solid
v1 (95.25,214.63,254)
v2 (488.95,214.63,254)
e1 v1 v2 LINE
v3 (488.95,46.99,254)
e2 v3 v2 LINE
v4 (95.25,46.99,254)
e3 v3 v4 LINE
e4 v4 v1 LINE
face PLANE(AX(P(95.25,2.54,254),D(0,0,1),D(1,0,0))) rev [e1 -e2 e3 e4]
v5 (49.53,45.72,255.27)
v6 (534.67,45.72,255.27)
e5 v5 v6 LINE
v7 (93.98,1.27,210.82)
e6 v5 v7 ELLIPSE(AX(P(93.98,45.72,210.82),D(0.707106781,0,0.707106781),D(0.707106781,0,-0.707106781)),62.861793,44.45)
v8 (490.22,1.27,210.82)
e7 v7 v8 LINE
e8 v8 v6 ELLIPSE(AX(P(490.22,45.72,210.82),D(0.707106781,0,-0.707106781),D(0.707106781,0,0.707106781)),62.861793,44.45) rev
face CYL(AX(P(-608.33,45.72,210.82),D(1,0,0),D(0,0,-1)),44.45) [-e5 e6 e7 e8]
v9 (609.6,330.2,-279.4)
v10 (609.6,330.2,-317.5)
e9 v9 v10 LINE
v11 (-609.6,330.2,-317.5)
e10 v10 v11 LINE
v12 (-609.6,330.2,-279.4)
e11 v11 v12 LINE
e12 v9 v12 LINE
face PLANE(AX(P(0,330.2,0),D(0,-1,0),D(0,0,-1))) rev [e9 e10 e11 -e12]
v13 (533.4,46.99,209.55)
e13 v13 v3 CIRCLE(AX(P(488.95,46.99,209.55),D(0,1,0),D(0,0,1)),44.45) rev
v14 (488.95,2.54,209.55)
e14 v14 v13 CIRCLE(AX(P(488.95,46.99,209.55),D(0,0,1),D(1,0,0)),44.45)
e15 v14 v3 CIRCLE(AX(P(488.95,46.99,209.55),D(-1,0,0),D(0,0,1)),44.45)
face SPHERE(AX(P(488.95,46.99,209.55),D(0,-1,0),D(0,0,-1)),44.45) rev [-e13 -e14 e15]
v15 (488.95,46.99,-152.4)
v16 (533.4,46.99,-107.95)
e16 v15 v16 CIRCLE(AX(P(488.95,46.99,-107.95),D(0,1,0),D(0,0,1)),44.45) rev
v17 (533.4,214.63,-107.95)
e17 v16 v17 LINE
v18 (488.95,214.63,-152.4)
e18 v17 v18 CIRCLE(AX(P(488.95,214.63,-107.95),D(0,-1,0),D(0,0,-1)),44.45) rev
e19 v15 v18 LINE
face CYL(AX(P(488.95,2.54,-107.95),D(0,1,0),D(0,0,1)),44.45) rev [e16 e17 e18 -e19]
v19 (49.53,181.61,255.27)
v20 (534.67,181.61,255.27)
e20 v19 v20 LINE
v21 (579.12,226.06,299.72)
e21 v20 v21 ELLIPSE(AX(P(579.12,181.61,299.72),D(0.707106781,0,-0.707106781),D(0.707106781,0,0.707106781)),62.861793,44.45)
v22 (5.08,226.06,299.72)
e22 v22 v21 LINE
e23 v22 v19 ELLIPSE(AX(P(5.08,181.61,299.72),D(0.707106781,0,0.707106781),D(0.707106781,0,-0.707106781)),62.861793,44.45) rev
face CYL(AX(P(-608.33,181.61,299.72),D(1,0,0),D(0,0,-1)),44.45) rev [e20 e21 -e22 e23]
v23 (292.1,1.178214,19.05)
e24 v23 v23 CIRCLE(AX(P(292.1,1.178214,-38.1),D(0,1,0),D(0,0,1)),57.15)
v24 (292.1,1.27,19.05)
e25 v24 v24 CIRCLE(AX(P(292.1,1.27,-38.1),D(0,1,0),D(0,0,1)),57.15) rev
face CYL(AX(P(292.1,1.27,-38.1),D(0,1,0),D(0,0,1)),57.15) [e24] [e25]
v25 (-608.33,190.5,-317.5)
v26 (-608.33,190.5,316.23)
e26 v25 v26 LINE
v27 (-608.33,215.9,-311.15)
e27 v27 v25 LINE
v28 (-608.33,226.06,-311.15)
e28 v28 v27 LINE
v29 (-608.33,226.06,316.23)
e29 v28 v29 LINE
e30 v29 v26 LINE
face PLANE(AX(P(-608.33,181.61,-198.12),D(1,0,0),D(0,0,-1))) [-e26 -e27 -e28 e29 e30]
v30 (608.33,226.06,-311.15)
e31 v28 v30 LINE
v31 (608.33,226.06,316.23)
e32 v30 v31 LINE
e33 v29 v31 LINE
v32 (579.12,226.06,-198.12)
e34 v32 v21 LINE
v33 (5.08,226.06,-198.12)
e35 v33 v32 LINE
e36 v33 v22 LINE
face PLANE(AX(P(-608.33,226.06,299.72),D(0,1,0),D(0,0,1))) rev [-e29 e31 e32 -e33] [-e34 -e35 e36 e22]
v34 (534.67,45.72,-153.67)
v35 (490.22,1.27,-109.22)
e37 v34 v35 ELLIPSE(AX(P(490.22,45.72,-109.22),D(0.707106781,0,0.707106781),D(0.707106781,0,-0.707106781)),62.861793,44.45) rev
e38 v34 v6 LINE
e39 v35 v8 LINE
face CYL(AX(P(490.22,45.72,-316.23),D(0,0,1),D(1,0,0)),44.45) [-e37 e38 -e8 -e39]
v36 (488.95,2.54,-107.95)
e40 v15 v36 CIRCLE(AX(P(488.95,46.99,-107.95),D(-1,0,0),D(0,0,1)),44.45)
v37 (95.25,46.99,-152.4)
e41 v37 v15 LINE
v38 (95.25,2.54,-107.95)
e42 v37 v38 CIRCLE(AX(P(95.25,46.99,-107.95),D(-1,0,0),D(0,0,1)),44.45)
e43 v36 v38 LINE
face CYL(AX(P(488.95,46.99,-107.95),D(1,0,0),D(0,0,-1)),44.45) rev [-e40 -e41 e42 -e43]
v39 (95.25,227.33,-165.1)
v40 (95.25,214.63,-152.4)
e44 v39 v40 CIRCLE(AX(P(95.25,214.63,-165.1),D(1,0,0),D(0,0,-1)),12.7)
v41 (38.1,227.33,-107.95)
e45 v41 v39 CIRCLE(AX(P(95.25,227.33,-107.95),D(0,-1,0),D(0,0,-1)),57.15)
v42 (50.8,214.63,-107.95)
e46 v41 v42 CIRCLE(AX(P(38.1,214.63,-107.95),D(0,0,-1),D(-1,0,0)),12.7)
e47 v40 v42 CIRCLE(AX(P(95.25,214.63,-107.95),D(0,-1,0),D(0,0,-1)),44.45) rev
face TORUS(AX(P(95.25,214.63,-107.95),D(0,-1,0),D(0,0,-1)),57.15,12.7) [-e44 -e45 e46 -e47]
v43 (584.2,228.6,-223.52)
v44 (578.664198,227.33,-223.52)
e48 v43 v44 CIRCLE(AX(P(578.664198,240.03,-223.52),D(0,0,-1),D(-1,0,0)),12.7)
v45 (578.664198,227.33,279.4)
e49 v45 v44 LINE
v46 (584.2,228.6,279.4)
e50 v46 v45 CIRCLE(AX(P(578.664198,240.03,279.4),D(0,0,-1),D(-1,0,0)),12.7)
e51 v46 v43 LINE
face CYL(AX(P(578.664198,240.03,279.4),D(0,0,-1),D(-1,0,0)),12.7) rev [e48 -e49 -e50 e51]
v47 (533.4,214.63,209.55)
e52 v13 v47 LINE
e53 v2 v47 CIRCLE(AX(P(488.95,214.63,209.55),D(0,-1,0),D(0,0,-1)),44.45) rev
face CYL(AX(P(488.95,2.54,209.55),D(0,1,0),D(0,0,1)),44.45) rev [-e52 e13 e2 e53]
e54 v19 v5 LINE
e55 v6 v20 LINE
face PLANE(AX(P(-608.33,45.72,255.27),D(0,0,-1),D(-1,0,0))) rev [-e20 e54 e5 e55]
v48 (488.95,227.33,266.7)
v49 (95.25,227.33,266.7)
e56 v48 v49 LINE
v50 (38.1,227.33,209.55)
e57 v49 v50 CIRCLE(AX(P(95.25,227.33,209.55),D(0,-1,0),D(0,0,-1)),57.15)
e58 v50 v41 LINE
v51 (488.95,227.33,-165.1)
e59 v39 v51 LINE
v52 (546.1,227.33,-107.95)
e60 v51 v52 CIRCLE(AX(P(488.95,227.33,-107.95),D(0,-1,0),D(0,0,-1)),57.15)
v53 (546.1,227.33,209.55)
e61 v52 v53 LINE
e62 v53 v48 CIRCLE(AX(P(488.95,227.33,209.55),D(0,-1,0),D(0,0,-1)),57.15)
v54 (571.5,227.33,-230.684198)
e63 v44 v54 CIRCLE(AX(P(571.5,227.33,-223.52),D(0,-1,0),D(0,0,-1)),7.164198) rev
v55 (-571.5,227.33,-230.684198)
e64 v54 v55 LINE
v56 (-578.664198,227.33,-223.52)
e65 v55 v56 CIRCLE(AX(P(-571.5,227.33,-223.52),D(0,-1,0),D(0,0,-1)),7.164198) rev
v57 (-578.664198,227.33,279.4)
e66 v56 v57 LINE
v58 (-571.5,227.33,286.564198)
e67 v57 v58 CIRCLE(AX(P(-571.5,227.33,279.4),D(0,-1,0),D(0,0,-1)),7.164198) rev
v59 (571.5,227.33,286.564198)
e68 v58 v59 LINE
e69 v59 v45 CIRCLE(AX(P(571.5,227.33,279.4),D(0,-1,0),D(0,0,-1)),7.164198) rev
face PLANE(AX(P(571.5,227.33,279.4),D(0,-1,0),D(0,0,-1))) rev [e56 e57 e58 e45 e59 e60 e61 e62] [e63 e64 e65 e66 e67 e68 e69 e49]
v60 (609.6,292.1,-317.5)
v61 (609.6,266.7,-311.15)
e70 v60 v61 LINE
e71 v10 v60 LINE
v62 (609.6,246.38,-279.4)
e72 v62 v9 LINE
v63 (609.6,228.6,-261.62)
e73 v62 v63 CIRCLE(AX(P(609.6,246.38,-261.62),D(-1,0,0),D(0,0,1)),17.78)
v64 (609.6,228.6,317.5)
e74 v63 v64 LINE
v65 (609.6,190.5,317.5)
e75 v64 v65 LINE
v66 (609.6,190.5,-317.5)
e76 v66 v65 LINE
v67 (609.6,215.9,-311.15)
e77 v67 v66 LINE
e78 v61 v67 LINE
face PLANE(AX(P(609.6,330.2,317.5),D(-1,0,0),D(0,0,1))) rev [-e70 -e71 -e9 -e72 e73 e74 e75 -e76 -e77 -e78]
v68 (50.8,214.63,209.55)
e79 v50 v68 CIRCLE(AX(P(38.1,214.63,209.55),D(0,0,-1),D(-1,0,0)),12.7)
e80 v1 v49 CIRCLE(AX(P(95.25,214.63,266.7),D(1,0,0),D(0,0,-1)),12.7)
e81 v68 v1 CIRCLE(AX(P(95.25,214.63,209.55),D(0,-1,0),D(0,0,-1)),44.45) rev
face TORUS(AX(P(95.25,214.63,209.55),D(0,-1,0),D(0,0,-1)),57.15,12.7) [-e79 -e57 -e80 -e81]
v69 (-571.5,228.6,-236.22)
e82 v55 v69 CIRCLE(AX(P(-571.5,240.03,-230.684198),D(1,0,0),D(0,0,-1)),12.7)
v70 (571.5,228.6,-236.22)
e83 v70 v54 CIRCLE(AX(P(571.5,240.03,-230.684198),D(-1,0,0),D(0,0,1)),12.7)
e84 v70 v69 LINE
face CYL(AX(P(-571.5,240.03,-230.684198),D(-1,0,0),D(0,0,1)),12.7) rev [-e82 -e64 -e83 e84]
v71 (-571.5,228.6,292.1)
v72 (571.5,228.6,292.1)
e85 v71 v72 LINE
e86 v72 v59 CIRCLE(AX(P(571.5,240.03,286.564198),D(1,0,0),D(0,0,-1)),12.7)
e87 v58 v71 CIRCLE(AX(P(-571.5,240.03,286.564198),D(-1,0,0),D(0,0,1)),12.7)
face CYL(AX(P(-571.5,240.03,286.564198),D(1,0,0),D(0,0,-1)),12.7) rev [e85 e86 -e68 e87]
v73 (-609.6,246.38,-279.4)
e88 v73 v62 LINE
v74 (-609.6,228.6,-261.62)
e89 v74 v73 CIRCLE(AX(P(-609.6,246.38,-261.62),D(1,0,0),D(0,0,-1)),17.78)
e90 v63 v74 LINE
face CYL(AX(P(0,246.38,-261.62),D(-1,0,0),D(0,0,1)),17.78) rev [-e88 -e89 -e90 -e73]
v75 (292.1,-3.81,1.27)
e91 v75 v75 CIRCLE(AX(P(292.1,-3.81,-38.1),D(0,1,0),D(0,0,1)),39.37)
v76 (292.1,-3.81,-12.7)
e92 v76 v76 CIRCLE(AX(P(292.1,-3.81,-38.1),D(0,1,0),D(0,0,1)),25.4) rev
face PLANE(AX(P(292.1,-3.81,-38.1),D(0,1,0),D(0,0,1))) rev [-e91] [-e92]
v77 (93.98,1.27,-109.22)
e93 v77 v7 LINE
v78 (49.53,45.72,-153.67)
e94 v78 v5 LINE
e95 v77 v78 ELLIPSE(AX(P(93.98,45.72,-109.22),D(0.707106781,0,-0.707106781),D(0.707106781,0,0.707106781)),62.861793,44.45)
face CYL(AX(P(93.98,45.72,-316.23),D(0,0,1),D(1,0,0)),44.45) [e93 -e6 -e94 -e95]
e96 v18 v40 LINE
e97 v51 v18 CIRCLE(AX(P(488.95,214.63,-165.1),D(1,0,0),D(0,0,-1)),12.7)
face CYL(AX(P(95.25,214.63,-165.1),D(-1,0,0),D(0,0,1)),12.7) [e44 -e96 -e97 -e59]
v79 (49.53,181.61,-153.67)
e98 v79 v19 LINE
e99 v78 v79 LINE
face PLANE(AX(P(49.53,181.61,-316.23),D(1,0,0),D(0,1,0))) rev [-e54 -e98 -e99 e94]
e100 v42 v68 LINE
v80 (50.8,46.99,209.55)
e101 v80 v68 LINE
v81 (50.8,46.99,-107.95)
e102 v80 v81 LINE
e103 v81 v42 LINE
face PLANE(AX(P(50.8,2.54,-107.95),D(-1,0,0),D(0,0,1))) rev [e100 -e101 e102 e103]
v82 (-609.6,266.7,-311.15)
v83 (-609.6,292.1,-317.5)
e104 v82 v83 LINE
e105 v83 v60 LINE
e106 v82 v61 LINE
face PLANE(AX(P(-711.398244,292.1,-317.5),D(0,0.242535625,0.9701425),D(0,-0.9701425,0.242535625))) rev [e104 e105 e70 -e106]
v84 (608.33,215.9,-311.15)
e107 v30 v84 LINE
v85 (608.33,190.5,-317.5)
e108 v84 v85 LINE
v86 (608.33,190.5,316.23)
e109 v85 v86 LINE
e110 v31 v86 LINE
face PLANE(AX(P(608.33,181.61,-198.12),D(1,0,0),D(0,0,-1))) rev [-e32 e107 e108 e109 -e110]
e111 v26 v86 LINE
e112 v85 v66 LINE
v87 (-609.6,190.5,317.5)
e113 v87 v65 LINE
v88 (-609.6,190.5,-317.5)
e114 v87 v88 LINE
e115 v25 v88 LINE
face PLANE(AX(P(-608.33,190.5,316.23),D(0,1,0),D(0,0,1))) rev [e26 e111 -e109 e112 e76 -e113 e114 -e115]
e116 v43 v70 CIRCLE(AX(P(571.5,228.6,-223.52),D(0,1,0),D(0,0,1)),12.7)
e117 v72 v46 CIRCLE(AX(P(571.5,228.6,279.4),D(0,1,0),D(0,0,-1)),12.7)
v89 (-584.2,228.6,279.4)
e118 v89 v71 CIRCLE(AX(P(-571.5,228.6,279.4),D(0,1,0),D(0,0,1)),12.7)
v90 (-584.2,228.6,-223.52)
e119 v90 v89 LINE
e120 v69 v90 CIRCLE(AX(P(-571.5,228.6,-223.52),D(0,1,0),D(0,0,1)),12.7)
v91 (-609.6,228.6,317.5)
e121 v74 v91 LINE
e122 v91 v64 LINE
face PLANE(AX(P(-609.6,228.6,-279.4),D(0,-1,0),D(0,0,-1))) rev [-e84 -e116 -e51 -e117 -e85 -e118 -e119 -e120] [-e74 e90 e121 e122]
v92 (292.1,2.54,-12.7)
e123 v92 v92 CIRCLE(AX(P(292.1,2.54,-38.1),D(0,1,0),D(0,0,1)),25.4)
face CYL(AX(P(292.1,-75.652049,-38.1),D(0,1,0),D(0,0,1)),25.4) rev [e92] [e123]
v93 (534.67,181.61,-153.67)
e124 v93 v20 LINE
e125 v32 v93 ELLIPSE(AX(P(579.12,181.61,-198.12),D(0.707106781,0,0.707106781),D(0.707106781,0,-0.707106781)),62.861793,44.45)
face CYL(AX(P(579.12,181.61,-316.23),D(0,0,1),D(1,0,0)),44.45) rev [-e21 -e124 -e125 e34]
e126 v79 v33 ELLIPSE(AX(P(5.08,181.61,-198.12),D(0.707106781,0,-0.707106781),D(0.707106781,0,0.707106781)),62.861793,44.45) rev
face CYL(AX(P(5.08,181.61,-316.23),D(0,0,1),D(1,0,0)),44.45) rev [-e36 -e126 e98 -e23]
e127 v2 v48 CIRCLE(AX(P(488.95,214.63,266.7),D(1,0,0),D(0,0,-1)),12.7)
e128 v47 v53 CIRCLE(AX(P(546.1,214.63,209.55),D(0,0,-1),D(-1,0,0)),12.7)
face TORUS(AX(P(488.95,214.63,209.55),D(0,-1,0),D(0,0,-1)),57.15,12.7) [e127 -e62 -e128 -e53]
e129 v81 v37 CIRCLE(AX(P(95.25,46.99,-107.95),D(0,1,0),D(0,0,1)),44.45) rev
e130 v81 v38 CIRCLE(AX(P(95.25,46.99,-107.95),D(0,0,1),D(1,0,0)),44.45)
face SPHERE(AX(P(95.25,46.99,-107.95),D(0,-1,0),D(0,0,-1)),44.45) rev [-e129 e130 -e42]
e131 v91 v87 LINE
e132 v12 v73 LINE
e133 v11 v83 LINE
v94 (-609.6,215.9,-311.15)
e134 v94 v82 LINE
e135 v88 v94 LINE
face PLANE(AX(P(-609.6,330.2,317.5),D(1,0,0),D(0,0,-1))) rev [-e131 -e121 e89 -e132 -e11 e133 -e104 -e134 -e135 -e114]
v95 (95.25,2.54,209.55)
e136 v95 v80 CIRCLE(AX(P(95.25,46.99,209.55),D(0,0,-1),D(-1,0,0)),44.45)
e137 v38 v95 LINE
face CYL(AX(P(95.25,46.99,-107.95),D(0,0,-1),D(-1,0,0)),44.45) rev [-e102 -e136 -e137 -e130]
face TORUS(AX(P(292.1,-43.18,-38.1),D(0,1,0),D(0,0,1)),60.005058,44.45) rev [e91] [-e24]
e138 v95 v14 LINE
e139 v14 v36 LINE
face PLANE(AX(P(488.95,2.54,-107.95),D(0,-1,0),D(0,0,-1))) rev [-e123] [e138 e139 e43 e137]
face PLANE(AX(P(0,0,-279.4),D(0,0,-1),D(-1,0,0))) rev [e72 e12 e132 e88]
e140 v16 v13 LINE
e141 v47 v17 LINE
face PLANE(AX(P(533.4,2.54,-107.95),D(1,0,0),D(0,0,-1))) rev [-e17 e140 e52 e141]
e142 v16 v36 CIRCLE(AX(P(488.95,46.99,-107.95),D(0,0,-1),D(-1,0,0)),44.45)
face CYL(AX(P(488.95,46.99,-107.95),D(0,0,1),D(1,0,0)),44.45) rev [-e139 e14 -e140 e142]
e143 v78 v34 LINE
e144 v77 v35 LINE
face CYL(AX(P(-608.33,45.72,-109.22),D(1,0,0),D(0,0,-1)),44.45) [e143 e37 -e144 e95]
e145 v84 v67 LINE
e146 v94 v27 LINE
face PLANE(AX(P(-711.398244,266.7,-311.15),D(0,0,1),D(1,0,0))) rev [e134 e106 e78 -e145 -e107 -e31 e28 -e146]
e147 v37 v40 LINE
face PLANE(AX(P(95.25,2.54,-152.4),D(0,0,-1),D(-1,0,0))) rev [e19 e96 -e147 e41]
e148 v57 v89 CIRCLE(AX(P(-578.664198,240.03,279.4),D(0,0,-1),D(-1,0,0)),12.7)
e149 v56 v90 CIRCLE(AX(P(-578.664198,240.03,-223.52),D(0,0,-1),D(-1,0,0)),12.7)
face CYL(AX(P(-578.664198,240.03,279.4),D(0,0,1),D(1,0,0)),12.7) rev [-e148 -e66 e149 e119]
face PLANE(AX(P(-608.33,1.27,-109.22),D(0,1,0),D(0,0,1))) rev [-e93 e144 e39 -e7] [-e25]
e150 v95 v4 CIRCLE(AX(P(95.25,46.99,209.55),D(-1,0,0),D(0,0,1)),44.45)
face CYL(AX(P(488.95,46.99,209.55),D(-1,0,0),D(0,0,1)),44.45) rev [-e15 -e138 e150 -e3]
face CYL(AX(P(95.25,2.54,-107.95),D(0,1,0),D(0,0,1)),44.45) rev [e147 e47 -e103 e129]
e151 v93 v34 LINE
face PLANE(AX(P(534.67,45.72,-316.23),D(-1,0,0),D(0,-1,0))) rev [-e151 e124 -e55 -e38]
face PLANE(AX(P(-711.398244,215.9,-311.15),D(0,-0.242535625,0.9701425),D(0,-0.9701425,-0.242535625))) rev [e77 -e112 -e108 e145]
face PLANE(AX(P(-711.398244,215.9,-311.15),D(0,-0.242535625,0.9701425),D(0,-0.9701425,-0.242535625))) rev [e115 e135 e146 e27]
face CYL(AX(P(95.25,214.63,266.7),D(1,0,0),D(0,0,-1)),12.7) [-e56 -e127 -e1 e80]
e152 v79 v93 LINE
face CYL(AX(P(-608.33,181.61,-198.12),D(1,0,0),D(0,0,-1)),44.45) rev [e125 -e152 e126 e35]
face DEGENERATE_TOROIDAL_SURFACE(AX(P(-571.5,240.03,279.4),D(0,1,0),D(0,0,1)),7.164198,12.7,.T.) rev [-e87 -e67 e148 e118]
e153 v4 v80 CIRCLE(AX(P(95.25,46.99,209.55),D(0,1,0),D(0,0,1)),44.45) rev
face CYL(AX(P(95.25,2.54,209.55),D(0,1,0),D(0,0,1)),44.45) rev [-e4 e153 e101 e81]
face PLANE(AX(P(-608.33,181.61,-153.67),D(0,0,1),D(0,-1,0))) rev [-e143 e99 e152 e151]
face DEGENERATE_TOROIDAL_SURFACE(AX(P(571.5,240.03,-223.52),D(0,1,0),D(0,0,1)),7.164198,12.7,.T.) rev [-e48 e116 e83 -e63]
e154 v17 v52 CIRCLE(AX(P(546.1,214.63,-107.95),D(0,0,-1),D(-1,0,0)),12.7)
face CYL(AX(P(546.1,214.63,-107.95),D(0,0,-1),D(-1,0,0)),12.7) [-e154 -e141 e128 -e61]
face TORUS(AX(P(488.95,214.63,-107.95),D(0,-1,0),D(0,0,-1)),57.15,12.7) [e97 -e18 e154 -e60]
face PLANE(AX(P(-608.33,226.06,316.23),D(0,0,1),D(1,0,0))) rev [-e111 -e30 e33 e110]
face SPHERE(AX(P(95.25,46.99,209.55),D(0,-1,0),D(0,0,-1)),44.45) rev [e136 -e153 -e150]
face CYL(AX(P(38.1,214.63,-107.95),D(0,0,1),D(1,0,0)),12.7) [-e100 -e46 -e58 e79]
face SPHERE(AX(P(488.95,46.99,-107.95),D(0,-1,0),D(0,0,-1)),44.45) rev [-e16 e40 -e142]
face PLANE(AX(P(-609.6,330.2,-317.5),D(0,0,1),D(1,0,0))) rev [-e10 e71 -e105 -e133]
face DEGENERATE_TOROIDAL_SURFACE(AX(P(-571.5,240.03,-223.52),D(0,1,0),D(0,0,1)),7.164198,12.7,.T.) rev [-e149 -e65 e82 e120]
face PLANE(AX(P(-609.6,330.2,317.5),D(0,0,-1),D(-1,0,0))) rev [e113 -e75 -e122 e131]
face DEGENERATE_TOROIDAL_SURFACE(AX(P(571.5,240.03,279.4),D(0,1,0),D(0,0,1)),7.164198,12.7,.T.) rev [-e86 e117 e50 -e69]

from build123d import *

# Parameters (mm, degrees)
SKETCH1_W           = 1219.2
SKETCH1_H           = 635
BOSS_EXTRUDE2_DEPTH = 330.2
SKETCH3_W           = 1219.2
SKETCH3_H           = 101.6
CUT_EXTRUDE1_DEPTH  = 596.9
FILLET2_R           = 17.78
CUT_EXTRUDE2_DEPTH  = 226.06
FILLET4_R           = 44.45
CUT_EXTRUDE3_DEPTH  = 1.27
FILLET5_R           = 12.7
CUT_EXTRUDE4_DEPTH  = 608.33
CUT_EXTRUDE6_DEPTH  = 316.23
SKETCH12_W          = 635
SKETCH12_H          = 190.5
CUT_EXTRUDE7_DEPTH  = 2.54
SKETCH13_W          = 635
SKETCH13_H          = 190.5
CUT_EXTRUDE8_DEPTH  = 2.54
SKETCH15_R          = 25.4
CUT_EXTRUDE9_DEPTH  = 6.35
CUT_EXTRUDE10_START = -1219.2
CUT_EXTRUDE10_DEPTH = 1219.2


with BuildPart() as part:
    # Sketch1 → Boss-Extrude2 (new body)
    with BuildSketch(Plane(origin=(0, 0, 0), x_dir=(1, 0, 0), z_dir=(0, 1, 0))):
        Rectangle(SKETCH1_W, SKETCH1_H)
    extrude(amount=BOSS_EXTRUDE2_DEPTH)

    # Sketch3 → Cut-Extrude1 (cut)
    with BuildSketch(Plane.XY.offset(317.5)):
        with Locations((0, 279.4)):
            Rectangle(SKETCH3_W, SKETCH3_H)
    extrude(amount=-CUT_EXTRUDE1_DEPTH, mode=Mode.SUBTRACT)

    # Fillet2
    fillet2_edges = [part.edges().sort_by_distance(p)[0] for p in [
        (0, 228.6, -279.4),
    ]]
    fillet(fillet2_edges, radius=FILLET2_R)

    # Sketch5 → Cut-Extrude2 (cut)
    with BuildSketch(Plane(origin=(0, 228.6, 0), x_dir=(1, 0, 0), z_dir=(0, 1, 0))):
        with BuildLine():
            Line((95.25, 152.4), (488.95, 152.4))
            ThreePointArc((488.95, 152.4), (520.380896424, 139.380896424), (533.4, 107.95))
            Line((533.4, 107.95), (533.4, -209.55))
            ThreePointArc((533.4, -209.55), (520.380896424, -240.980896424), (488.95, -254))
            Line((488.95, -254), (95.25, -254))
            ThreePointArc((95.25, -254), (63.819103576, -240.980896424), (50.8, -209.55))
            Line((50.8, -209.55), (50.8, 107.95))
            ThreePointArc((50.8, 107.95), (63.819103576, 139.380896424), (95.25, 152.4))
        make_face()
    extrude(amount=-CUT_EXTRUDE2_DEPTH, mode=Mode.SUBTRACT)

    # Fillet4
    fillet4_edges = [part.edges().sort_by_distance(p)[0] for p in [
        (520.380896424, 2.54, -139.380896424),
        (533.4, 2.54, 50.8),
        (520.380896424, 2.54, 240.980896424),
        (292.1, 2.54, 254),
        (63.819103576, 2.54, 240.980896424),
        (50.8, 2.54, 50.8),
        (63.819103576, 2.54, -139.380896424),
        (292.1, 2.54, -152.4),
    ]]
    fillet(fillet4_edges, radius=FILLET4_R)

    # Sketch7 → Cut-Extrude3 (cut)
    with BuildSketch(Plane(origin=(0, 228.6, 0), x_dir=(1, 0, 0), z_dir=(0, 1, 0))):
        with BuildLine():
            Line((-571.5, -292.1), (571.5, -292.1))
            ThreePointArc((571.5, -292.1), (580.480256121, -288.380256121), (584.2, -279.4))
            Line((584.2, -279.4), (584.2, 223.52))
            ThreePointArc((584.2, 223.52), (580.480256121, 232.500256121), (571.5, 236.22))
            Line((571.5, 236.22), (-571.5, 236.22))
            ThreePointArc((-571.5, 236.22), (-580.480256121, 232.500256121), (-584.2, 223.52))
            Line((-584.2, 223.52), (-584.2, -279.4))
            ThreePointArc((-584.2, -279.4), (-580.480256121, -288.380256121), (-571.5, -292.1))
        make_face()
    extrude(amount=-CUT_EXTRUDE3_DEPTH, mode=Mode.SUBTRACT)

    # Fillet5
    # the kernel refuses this fillet: 12.7 mm, written as the material it adds along each edge
    with BuildSketch(Plane(origin=(-571.5, 227.33, 292.1), x_dir=(0, 0, -1), z_dir=(1, 0, 0)), Plane(origin=(571.5, 227.33, -236.22), x_dir=(0, 0, 1), z_dir=(-1, 0, 0))) as fillet5_piece_1:
        with BuildLine():
            CenterArc((5.535801658, 12.7), FILLET5_R, 244.158067237, 25.841932763)
            Line((0, 1.27), (0, 0))
            Line((0, 0), (5.535801658, 0))
        make_face()
    extrude(amount=1143)
    with BuildSketch(Plane(origin=(-571.5, 227.33, 279.4), x_dir=(-1, 0, 0), z_dir=(0, 0, -1))) as fillet5_piece_2:
        with BuildLine():
            CenterArc((7.164198342, 12.7), FILLET5_R, 270, 25.841932763)
            Line((12.7, 1.27), (12.7, 0))
            Line((12.7, 0), (7.164198342, 0))
        make_face()
    revolve(axis=Axis((-571.5, 227.33, 279.4), (0, 1, 0)), revolution_arc=90)
    with BuildSketch(Plane(origin=(-584.2, 227.33, -223.52), x_dir=(1, 0, 0), z_dir=(0, 0, 1)), Plane(origin=(584.2, 227.33, 279.4), x_dir=(-1, 0, 0), z_dir=(0, 0, -1))) as fillet5_piece_3:
        with BuildLine():
            CenterArc((5.535801658, 12.7), FILLET5_R, 244.158067237, 25.841932763)
            Line((0, 1.27), (0, 0))
            Line((0, 0), (5.535801658, 0))
        make_face()
    extrude(amount=502.92)
    with BuildSketch(Plane(origin=(-571.5, 227.33, -223.52), x_dir=(0, 0, -1), z_dir=(1, 0, 0))) as fillet5_piece_4:
        with BuildLine():
            CenterArc((7.164198342, 12.7), FILLET5_R, 270, 25.841932763)
            Line((12.7, 1.27), (12.7, 0))
            Line((12.7, 0), (7.164198342, 0))
        make_face()
    revolve(axis=Axis((-571.5, 227.33, -223.52), (0, 1, 0)), revolution_arc=90)
    with BuildSketch(Plane(origin=(571.5, 227.33, -223.52), x_dir=(1, 0, 0), z_dir=(0, 0, 1))) as fillet5_piece_5:
        with BuildLine():
            CenterArc((7.164198342, 12.7), FILLET5_R, 270, 25.841932763)
            Line((12.7, 1.27), (12.7, 0))
            Line((12.7, 0), (7.164198342, 0))
        make_face()
    revolve(axis=Axis((571.5, 227.33, -223.52), (0, 1, 0)), revolution_arc=90)
    with BuildSketch(Plane(origin=(571.5, 227.33, 279.4), x_dir=(0, 0, 1), z_dir=(-1, 0, 0))) as fillet5_piece_6:
        with BuildLine():
            CenterArc((7.164198342, 12.7), FILLET5_R, 270, 25.841932763)
            Line((12.7, 1.27), (12.7, 0))
            Line((12.7, 0), (7.164198342, 0))
        make_face()
    revolve(axis=Axis((571.5, 227.33, 279.4), (0, 1, 0)), revolution_arc=90)
    # the kernel refuses this fillet: 12.7 mm, written as the material it takes off along each edge
    with BuildSketch(Plane(origin=(488.95, 227.33, -107.95), x_dir=(1, 0, 0), z_dir=(0, 0, 1))) as fillet5_2_piece_1:
        with BuildLine():
            CenterArc((44.45 + FILLET5_R, -FILLET5_R), FILLET5_R, 90, 90)
            Line((44.45, -FILLET5_R), (44.45, 0))
            Line((44.45, 0), (44.45 + FILLET5_R, 0))
        make_face()
    revolve(axis=Axis((488.95, 227.33, -107.95), (0, 1, 0)), revolution_arc=90, mode=Mode.SUBTRACT)
    with BuildSketch(Plane(origin=(488.95, 227.33, -152.4), x_dir=(0, 0, -1), z_dir=(-1, 0, 0)), Plane(origin=(95.25, 227.33, 254), x_dir=(0, 0, 1), z_dir=(1, 0, 0))) as fillet5_2_piece_2:
        with BuildLine():
            CenterArc((FILLET5_R, FILLET5_R), FILLET5_R, 180, 90)
            Line((0, FILLET5_R), (0, 0))
            Line((0, 0), (FILLET5_R, 0))
        make_face()
    extrude(amount=393.7, mode=Mode.SUBTRACT)
    with BuildSketch(Plane(origin=(95.25, 227.33, -107.95), x_dir=(0, 0, -1), z_dir=(1, 0, 0))) as fillet5_2_piece_3:
        with BuildLine():
            CenterArc((44.45 + FILLET5_R, -FILLET5_R), FILLET5_R, 90, 90)
            Line((44.45, -FILLET5_R), (44.45, 0))
            Line((44.45, 0), (44.45 + FILLET5_R, 0))
        make_face()
    revolve(axis=Axis((95.25, 227.33, -107.95), (0, 1, 0)), revolution_arc=90, mode=Mode.SUBTRACT)
    with BuildSketch(Plane(origin=(50.8, 227.33, -107.95), x_dir=(0, -1, 0), z_dir=(0, 0, 1))) as fillet5_2_piece_4:
        with BuildLine():
            CenterArc((FILLET5_R, -FILLET5_R), FILLET5_R, 90, 90)
            Line((0, -FILLET5_R), (0, 0))
            Line((0, 0), (FILLET5_R, 0))
        make_face()
    extrude(amount=317.5, mode=Mode.SUBTRACT)
    with BuildSketch(Plane(origin=(95.25, 227.33, 209.55), x_dir=(-1, 0, 0), z_dir=(0, 0, -1))) as fillet5_2_piece_5:
        with BuildLine():
            CenterArc((44.45 + FILLET5_R, -FILLET5_R), FILLET5_R, 90, 90)
            Line((44.45, -FILLET5_R), (44.45, 0))
            Line((44.45, 0), (44.45 + FILLET5_R, 0))
        make_face()
    revolve(axis=Axis((95.25, 227.33, 209.55), (0, 1, 0)), revolution_arc=90, mode=Mode.SUBTRACT)
    with BuildSketch(Plane(origin=(488.95, 227.33, 209.55), x_dir=(0, 0, 1), z_dir=(-1, 0, 0))) as fillet5_2_piece_6:
        with BuildLine():
            CenterArc((44.45 + FILLET5_R, -FILLET5_R), FILLET5_R, 90, 90)
            Line((44.45, -FILLET5_R), (44.45, 0))
            Line((44.45, 0), (44.45 + FILLET5_R, 0))
        make_face()
    revolve(axis=Axis((488.95, 227.33, 209.55), (0, 1, 0)), revolution_arc=90, mode=Mode.SUBTRACT)
    with BuildSketch(Plane(origin=(533.4, 227.33, 209.55), x_dir=(1, 0, 0), z_dir=(0, 0, -1))) as fillet5_2_piece_7:
        with BuildLine():
            CenterArc((FILLET5_R, FILLET5_R), FILLET5_R, 180, 90)
            Line((0, FILLET5_R), (0, 0))
            Line((0, 0), (FILLET5_R, 0))
        make_face()
    extrude(amount=317.5, mode=Mode.SUBTRACT)

    # Sketch9 → Cut-Extrude4 (cut, symmetric)
    with BuildSketch(Plane(origin=(0, 0, 0), x_dir=(0, 0, -1), z_dir=(1, 0, 0))):
        with BuildLine():
            Line((317.5, 226.06), (198.12, 226.06))
            ThreePointArc((198.12, 226.06), (166.689103576, 213.040896424), (153.67, 181.61))
            Line((153.67, 181.61), (153.67, 45.72))
            ThreePointArc((153.67, 45.72), (140.650896424, 14.289103576), (109.22, 1.27))
            Line((109.22, 1.27), (-210.82, 1.27))
            ThreePointArc((-210.82, 1.27), (-242.250896424, 14.289103576), (-255.27, 45.72))
            Line((-255.27, 45.72), (-255.27, 181.61))
            ThreePointArc((-255.27, 181.61), (-268.289103576, 213.040896424), (-299.72, 226.06))
            Line((-299.72, 226.06), (-316.23, 226.06))
            Line((-316.23, 226.06), (-316.23, 190.5))
            Line((-316.23, 190.5), (-317.5, 190.5))
            Line((-317.5, 190.5), (-317.5, 0))
            Line((-317.5, 0), (317.5, 0))
            Line((317.5, 0), (317.5, 226.06))
        make_face()
    extrude(amount=CUT_EXTRUDE4_DEPTH, both=True, mode=Mode.SUBTRACT)

    # Sketch11 → Cut-Extrude6 (cut, symmetric)
    with BuildSketch(Plane.XY):
        with BuildLine():
            Line((-608.33, 226.06), (5.08, 226.06))
            ThreePointArc((5.08, 226.06), (36.510896424, 213.040896424), (49.53, 181.61))
            Line((49.53, 181.61), (49.53, 45.72))
            ThreePointArc((49.53, 45.72), (62.549103576, 14.289103576), (93.98, 1.27))
            Line((93.98, 1.27), (-608.33, 1.27))
            Line((-608.33, 1.27), (-608.33, 226.06))
        make_face()
        with BuildLine():
            Line((534.67, 45.72), (534.67, 181.61))
            ThreePointArc((534.67, 181.61), (547.689103576, 213.040896424), (579.12, 226.06))
            Line((579.12, 226.06), (608.33, 226.06))
            Line((608.33, 226.06), (608.33, 1.27))
            Line((608.33, 1.27), (490.22, 1.27))
            ThreePointArc((490.22, 1.27), (521.650896424, 14.289103576), (534.67, 45.72))
        make_face()
    extrude(amount=CUT_EXTRUDE6_DEPTH, both=True, mode=Mode.SUBTRACT)

    # Sketch12 → Cut-Extrude7 (cut)
    with BuildSketch(Plane.ZY.offset(609.6)):
        with Locations((0, 95.25)):
            Rectangle(SKETCH12_W, SKETCH12_H)
    extrude(amount=-CUT_EXTRUDE7_DEPTH, mode=Mode.SUBTRACT)

    # Sketch13 → Cut-Extrude8 (cut)
    with BuildSketch(Plane(origin=(609.6, 0, 0), x_dir=(0, 0, -1), z_dir=(1, 0, 0))):
        with Locations((0, 95.25)):
            Rectangle(SKETCH13_W, SKETCH13_H)
    extrude(amount=-CUT_EXTRUDE8_DEPTH, mode=Mode.SUBTRACT)

    # Sketch16 → Revolve1 (revolve)
    with BuildSketch(Plane(origin=(292.1, 0, 0), x_dir=(0, 0, -1), z_dir=(1, 0, 0)), mode=Mode.PRIVATE) as revolve1_sk:
        with BuildLine():
            Line((38.1, 1.27), (38.1, -3.81))
            Line((38.1, -3.81), (77.47, -3.81))
            ThreePointArc((77.47, -3.81), (86.098103461, -0.38238846), (95.25, 1.178213968))
            Line((95.25, 1.178213968), (95.25, 1.27))
            Line((95.25, 1.27), (38.1, 1.27))
        make_face()
    revolve(revolve1_sk.sketch.rotate(Axis((292.1, 1.27, -38.1), (0, -1, 0)), 180), axis=Axis((292.1, 1.27, -38.1), (0, -1, 0)))

    # Sketch15 → Cut-Extrude9 (cut)
    with BuildSketch(Plane(origin=(0, 2.54, 0), x_dir=(1, 0, 0), z_dir=(0, 1, 0))):
        with Locations(Location((292.1, 38.1, 0), (0, 0, 270))):
            Circle(SKETCH15_R)
    extrude(amount=-CUT_EXTRUDE9_DEPTH, mode=Mode.SUBTRACT)

    # Sketch17 → Cut-Extrude10 (cut)
    with BuildSketch(Plane(origin=(609.6, 0, 0), x_dir=(0, 0, -1), z_dir=(1, 0, 0)).offset(CUT_EXTRUDE10_START)):
        Polygon((317.5, 292.1), (311.15, 266.7), (311.15, 215.9), (317.5, 190.5), align=None)
    extrude(amount=CUT_EXTRUDE10_DEPTH, mode=Mode.SUBTRACT)


solid = part.part
